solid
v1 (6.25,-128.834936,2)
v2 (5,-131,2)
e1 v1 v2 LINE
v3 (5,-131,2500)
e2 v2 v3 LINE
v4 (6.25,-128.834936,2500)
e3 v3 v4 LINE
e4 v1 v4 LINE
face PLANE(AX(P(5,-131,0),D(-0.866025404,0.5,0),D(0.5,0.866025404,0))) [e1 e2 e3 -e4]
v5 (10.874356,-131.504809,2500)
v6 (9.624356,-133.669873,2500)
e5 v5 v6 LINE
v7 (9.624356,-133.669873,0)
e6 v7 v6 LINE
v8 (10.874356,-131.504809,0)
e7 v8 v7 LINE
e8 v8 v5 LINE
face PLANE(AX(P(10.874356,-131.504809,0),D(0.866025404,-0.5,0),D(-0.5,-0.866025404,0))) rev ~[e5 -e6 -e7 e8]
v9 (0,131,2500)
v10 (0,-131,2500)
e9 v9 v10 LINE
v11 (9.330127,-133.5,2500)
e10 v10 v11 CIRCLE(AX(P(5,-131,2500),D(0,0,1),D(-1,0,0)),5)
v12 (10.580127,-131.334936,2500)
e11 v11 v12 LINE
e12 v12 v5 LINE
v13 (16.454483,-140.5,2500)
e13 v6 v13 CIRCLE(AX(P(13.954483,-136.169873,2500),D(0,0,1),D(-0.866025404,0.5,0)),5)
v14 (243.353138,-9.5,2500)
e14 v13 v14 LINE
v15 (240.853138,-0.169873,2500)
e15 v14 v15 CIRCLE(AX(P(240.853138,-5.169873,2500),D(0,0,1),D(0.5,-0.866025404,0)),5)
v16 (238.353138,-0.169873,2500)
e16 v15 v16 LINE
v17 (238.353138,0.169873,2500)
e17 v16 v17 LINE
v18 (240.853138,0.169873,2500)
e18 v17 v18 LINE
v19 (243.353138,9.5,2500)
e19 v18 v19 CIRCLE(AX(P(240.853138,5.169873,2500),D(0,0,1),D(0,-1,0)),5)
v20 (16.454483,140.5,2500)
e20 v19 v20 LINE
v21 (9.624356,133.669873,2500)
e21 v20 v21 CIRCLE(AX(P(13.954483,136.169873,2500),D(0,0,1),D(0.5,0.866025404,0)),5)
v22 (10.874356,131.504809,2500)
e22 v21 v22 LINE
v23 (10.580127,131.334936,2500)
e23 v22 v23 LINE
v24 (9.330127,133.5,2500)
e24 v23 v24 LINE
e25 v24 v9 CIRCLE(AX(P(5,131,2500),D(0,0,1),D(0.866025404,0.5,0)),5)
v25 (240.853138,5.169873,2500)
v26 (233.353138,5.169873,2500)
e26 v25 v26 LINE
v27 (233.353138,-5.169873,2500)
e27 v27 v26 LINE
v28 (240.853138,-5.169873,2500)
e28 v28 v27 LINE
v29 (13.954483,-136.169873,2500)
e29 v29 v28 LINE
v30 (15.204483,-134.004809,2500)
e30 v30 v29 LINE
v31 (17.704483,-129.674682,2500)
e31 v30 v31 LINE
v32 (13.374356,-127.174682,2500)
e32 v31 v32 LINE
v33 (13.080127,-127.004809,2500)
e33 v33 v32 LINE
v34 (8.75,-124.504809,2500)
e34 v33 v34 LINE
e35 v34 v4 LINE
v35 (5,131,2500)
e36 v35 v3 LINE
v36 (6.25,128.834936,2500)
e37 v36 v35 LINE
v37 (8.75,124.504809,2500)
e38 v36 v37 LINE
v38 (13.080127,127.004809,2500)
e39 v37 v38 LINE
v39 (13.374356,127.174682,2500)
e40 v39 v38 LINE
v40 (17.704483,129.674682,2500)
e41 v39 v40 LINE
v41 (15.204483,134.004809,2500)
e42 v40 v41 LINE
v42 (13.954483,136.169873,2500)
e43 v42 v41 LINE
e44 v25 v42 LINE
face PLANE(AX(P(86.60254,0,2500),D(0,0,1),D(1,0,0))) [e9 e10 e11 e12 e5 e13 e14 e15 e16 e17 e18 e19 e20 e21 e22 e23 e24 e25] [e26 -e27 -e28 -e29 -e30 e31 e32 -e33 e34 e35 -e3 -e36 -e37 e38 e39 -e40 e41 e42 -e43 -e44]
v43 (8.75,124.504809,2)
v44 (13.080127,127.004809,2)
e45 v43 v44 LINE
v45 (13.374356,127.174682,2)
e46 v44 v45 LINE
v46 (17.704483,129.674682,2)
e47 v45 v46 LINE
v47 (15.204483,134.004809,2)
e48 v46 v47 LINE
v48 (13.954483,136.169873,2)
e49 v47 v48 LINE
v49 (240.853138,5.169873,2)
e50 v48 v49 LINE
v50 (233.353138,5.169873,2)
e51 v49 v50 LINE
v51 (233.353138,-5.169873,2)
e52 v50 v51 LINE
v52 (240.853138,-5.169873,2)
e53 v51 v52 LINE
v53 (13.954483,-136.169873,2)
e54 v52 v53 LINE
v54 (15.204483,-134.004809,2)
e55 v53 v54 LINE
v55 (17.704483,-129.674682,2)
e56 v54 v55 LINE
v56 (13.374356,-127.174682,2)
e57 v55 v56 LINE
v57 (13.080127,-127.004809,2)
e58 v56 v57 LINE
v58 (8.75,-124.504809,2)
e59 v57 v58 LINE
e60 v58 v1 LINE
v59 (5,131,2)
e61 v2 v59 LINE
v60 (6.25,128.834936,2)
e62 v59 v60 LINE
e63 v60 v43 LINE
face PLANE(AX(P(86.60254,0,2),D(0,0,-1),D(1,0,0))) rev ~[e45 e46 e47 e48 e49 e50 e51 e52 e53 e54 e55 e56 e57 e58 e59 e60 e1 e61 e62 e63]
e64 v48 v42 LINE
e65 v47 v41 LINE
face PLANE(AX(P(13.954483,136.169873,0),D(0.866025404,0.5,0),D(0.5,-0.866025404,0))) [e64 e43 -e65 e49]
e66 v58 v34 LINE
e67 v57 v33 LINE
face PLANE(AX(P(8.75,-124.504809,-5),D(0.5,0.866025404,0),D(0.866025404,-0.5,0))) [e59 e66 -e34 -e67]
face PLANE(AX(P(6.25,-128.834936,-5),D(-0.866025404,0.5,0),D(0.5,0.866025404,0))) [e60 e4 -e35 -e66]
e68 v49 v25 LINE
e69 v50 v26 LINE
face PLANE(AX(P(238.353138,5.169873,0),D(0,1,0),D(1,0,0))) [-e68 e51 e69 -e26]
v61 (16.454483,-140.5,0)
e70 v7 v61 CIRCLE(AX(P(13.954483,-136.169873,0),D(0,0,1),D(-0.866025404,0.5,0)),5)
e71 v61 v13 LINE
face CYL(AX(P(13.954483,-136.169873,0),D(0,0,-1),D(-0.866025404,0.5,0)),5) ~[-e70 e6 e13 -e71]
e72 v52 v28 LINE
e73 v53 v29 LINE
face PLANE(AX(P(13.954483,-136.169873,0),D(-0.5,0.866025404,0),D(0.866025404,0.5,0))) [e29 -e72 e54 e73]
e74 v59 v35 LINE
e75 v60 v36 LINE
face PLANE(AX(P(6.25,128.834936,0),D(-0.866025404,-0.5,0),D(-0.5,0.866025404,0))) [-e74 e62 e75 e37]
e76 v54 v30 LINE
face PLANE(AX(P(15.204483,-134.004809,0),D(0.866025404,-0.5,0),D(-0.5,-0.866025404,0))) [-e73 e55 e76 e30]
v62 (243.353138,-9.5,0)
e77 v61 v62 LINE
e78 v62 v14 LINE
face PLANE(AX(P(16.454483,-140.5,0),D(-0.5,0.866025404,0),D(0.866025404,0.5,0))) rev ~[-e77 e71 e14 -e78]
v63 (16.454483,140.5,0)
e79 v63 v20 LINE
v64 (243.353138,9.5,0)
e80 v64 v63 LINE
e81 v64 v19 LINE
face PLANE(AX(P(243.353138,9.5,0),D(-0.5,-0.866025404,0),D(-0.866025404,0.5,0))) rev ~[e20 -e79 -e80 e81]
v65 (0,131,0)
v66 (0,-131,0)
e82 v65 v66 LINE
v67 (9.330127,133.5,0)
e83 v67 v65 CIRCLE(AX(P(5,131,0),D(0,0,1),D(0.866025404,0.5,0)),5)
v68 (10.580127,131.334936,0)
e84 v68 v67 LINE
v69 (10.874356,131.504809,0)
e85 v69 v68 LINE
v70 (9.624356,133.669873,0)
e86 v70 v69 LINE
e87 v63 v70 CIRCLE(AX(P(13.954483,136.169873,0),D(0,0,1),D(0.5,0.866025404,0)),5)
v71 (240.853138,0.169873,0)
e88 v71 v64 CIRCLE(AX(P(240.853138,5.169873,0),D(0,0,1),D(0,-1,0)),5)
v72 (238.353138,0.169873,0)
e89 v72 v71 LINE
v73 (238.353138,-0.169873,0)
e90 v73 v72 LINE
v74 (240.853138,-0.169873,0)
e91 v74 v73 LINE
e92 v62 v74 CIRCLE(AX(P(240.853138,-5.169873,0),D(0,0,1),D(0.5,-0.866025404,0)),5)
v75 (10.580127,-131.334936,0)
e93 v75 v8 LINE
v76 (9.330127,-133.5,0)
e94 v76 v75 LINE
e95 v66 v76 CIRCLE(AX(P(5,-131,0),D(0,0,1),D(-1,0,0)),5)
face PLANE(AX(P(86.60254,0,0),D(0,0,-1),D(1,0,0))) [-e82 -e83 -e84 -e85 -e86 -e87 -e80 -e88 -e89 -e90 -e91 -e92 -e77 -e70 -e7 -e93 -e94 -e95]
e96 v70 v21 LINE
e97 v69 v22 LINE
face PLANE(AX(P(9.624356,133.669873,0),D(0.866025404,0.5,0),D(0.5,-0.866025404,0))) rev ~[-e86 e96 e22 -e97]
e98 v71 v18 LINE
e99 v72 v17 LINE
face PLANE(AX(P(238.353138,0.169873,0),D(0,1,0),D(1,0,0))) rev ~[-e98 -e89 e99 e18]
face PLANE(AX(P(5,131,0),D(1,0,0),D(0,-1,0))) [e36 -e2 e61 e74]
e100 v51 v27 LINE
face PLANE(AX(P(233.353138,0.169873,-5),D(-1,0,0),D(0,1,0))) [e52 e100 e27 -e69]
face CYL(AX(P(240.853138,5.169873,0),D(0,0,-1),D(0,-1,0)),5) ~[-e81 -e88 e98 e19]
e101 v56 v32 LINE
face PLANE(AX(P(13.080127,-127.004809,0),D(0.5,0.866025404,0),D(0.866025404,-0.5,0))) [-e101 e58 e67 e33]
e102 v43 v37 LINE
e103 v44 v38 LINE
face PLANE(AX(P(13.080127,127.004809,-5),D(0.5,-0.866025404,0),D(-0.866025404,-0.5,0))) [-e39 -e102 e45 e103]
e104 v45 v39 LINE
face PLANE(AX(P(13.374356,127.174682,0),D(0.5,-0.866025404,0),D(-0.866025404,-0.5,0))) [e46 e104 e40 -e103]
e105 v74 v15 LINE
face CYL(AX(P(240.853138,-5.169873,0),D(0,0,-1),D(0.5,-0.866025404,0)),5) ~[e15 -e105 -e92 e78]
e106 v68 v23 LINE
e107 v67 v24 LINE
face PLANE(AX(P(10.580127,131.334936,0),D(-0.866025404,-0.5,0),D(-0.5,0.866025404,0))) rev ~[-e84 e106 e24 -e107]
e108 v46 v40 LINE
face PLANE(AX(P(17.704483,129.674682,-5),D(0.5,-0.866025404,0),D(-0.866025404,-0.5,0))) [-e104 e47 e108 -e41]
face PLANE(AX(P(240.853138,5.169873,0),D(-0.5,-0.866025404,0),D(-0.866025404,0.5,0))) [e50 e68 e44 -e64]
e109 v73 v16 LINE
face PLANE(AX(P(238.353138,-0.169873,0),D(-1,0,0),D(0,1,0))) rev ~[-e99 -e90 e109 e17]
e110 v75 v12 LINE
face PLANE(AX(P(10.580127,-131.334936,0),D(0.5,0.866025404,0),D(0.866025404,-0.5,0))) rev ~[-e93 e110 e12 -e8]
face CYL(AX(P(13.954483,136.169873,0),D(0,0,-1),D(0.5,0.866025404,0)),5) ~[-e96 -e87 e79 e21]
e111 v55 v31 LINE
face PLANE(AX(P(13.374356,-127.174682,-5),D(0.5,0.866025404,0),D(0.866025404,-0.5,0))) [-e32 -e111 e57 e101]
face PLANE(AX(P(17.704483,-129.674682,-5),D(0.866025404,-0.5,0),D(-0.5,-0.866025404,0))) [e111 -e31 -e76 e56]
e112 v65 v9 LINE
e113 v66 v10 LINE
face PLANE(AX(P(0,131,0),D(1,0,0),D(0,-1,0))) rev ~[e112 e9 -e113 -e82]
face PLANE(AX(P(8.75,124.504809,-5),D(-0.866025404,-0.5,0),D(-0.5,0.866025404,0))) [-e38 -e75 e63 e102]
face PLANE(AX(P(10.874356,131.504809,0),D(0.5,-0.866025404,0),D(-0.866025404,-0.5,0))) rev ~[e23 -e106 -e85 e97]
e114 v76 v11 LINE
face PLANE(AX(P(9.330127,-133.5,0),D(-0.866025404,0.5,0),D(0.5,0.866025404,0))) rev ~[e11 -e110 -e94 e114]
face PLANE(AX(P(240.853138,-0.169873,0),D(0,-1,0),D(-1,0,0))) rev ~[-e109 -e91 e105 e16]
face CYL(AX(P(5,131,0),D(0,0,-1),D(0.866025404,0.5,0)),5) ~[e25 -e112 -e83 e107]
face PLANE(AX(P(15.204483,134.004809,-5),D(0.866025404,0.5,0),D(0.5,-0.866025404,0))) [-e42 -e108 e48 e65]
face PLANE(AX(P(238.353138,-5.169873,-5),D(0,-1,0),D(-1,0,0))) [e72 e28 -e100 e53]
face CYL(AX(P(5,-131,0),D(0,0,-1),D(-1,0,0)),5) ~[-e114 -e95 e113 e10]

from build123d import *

# Parameters (mm, degrees)
F1_DEPTH    = 2500
F2_T        = 5
F2_T3_DEPTH = 2510
F4_DEPTH    = 2


# Not quite as in the source:
# - a shell that OpenCascade refuses in one call is made with other operations: the cavity is built on its own and cut out


with BuildPart() as f1:
    # F0 (on Top) → F1 (new body)
    with BuildSketch(Plane.XY):
        with BuildLine():
            Line((243.3531384634, 9.5), (16.4544826719, 140.5))
            ThreePointArc((16.4544826719, 140.5), (10.418948766, 139.705406887), (9.624355653, 133.6698729811))
            Line((9.624355653, 133.6698729811), (10.874355653, 131.5048094716))
            Line((10.874355653, 131.5048094716), (10.5801270189, 131.3349364905))
            Line((10.5801270189, 131.3349364905), (9.3301270189, 133.5))
            ThreePointArc((9.3301270189, 133.5), (3.7059047745, 135.8296291314), (0, 131))
            Line((0, 131), (0, -131))
            ThreePointArc((0, -131), (3.7059047745, -135.8296291314), (9.3301270189, -133.5))
            Line((9.3301270189, -133.5), (10.5801270189, -131.3349364905))
            Line((10.5801270189, -131.3349364905), (10.874355653, -131.5048094716))
            Line((10.874355653, -131.5048094716), (9.624355653, -133.6698729811))
            ThreePointArc((9.624355653, -133.6698729811), (10.418948766, -139.705406887), (16.4544826719, -140.5))
            Line((16.4544826719, -140.5), (243.3531384634, -9.5))
            ThreePointArc((243.3531384634, -9.5), (245.6827675949, -3.8757777556), (240.8531384634, -0.1698729811))
            Line((240.8531384634, -0.1698729811), (238.3531384634, -0.1698729811))
            Line((238.3531384634, -0.1698729811), (238.3531384634, 0.1698729811))
            Line((238.3531384634, 0.1698729811), (240.8531384634, 0.1698729811))
            ThreePointArc((240.8531384634, 0.1698729811), (245.6827675949, 3.8757777556), (243.3531384634, 9.5))
        make_face()
    extrude(amount=F1_DEPTH)

    # F2: shell of thickness 5, made by hand


with BuildPart() as f2_core1:
    # F2_t2: copy of F1
    add(f1.part)

    # the walls: a layer under each face that stays
    f2_faces = [f2_core1.faces().sort_by_distance(p)[0] for p in [
        (129.9038105677, 75, 1250),
        (10.249355653, 132.5873412263, 1250),
        (10.727241336, 131.4198729811, 1250),
        (9.9551270189, 132.4174682453, 1250),
        (0, 0, 1250),
        (9.9551270189, -132.4174682453, 1250),
        (10.727241336, -131.4198729811, 1250),
        (10.249355653, -132.5873412263, 1250),
        (129.9038105677, -75, 1250),
        (239.6031384634, -0.1698729811, 1250),
        (238.3531384634, 0, 1250),
        (239.6031384634, 0.1698729811, 1250),
    ]]
    thicken(f2_faces, amount=-F2_T, mode=Mode.SUBTRACT)

    # F2_s4 → F2_t3 (cut)
    with BuildSketch(Plane.XY.offset(-5)):
        Polygon((10.8060543828, 131.5231107418), (15.2044826719, 134.0048094716), (17.7044826719, 129.6746824527), (13.374355653, 127.1746824527), align=None)
        Polygon((10.5984282891, 131.4032377607), (13.0801270189, 127.0048094716), (8.75, 124.5048094716), (6.25, 128.8349364905), align=None)
        Polygon((10.5984282891, -131.4032377607), (6.25, -128.8349364905), (8.75, -124.5048094716), (13.0801270189, -127.0048094716), align=None)
        Polygon((10.8060543828, -131.5231107418), (13.374355653, -127.1746824527), (17.7044826719, -129.6746824527), (15.2044826719, -134.0048094716), align=None)
        Polygon((238.4031384634, -0.1198729811), (238.3531384634, -5.1698729811), (233.3531384634, -5.1698729811), (233.3531384634, -0.1698729811), align=None)
        Polygon((238.4031384634, 0.1198729811), (233.3531384634, 0.1698729811), (233.3531384634, 5.1698729811), (238.3531384634, 5.1698729811), align=None)
    extrude(amount=F2_T3_DEPTH, mode=Mode.SUBTRACT)


with BuildPart() as f1_1:
    add(f1.part)

    # what is left inside the walls is the cavity
    f2_cavity = [f2_core1.part.solids().sort_by_distance(p)[0] for p in [
        (5.05, 0, 1666.666667),
    ]]
    add(f2_cavity, mode=Mode.SUBTRACT)

    # F3 (on face) → F4 (join)
    with BuildSketch(Plane(origin=(0, 0, 0), x_dir=(1, 0, 0), z_dir=(0, 0, -1))):
        Polygon((8.75, 124.5048094716), (5, 131), (5, -131), (8.75, -124.5048094716), (17.7044826719, -129.6746824527), (13.9544826719, -136.1698729811), (240.8531384634, -5.1698729811), (233.3531384634, -5.1698729811), (233.3531384634, 5.1698729811), (240.8531384634, 5.1698729811), (13.9544826719, 136.1698729811), (17.7044826719, 129.6746824527), align=None)
    extrude(amount=-F4_DEPTH)


solid = f1_1.part
